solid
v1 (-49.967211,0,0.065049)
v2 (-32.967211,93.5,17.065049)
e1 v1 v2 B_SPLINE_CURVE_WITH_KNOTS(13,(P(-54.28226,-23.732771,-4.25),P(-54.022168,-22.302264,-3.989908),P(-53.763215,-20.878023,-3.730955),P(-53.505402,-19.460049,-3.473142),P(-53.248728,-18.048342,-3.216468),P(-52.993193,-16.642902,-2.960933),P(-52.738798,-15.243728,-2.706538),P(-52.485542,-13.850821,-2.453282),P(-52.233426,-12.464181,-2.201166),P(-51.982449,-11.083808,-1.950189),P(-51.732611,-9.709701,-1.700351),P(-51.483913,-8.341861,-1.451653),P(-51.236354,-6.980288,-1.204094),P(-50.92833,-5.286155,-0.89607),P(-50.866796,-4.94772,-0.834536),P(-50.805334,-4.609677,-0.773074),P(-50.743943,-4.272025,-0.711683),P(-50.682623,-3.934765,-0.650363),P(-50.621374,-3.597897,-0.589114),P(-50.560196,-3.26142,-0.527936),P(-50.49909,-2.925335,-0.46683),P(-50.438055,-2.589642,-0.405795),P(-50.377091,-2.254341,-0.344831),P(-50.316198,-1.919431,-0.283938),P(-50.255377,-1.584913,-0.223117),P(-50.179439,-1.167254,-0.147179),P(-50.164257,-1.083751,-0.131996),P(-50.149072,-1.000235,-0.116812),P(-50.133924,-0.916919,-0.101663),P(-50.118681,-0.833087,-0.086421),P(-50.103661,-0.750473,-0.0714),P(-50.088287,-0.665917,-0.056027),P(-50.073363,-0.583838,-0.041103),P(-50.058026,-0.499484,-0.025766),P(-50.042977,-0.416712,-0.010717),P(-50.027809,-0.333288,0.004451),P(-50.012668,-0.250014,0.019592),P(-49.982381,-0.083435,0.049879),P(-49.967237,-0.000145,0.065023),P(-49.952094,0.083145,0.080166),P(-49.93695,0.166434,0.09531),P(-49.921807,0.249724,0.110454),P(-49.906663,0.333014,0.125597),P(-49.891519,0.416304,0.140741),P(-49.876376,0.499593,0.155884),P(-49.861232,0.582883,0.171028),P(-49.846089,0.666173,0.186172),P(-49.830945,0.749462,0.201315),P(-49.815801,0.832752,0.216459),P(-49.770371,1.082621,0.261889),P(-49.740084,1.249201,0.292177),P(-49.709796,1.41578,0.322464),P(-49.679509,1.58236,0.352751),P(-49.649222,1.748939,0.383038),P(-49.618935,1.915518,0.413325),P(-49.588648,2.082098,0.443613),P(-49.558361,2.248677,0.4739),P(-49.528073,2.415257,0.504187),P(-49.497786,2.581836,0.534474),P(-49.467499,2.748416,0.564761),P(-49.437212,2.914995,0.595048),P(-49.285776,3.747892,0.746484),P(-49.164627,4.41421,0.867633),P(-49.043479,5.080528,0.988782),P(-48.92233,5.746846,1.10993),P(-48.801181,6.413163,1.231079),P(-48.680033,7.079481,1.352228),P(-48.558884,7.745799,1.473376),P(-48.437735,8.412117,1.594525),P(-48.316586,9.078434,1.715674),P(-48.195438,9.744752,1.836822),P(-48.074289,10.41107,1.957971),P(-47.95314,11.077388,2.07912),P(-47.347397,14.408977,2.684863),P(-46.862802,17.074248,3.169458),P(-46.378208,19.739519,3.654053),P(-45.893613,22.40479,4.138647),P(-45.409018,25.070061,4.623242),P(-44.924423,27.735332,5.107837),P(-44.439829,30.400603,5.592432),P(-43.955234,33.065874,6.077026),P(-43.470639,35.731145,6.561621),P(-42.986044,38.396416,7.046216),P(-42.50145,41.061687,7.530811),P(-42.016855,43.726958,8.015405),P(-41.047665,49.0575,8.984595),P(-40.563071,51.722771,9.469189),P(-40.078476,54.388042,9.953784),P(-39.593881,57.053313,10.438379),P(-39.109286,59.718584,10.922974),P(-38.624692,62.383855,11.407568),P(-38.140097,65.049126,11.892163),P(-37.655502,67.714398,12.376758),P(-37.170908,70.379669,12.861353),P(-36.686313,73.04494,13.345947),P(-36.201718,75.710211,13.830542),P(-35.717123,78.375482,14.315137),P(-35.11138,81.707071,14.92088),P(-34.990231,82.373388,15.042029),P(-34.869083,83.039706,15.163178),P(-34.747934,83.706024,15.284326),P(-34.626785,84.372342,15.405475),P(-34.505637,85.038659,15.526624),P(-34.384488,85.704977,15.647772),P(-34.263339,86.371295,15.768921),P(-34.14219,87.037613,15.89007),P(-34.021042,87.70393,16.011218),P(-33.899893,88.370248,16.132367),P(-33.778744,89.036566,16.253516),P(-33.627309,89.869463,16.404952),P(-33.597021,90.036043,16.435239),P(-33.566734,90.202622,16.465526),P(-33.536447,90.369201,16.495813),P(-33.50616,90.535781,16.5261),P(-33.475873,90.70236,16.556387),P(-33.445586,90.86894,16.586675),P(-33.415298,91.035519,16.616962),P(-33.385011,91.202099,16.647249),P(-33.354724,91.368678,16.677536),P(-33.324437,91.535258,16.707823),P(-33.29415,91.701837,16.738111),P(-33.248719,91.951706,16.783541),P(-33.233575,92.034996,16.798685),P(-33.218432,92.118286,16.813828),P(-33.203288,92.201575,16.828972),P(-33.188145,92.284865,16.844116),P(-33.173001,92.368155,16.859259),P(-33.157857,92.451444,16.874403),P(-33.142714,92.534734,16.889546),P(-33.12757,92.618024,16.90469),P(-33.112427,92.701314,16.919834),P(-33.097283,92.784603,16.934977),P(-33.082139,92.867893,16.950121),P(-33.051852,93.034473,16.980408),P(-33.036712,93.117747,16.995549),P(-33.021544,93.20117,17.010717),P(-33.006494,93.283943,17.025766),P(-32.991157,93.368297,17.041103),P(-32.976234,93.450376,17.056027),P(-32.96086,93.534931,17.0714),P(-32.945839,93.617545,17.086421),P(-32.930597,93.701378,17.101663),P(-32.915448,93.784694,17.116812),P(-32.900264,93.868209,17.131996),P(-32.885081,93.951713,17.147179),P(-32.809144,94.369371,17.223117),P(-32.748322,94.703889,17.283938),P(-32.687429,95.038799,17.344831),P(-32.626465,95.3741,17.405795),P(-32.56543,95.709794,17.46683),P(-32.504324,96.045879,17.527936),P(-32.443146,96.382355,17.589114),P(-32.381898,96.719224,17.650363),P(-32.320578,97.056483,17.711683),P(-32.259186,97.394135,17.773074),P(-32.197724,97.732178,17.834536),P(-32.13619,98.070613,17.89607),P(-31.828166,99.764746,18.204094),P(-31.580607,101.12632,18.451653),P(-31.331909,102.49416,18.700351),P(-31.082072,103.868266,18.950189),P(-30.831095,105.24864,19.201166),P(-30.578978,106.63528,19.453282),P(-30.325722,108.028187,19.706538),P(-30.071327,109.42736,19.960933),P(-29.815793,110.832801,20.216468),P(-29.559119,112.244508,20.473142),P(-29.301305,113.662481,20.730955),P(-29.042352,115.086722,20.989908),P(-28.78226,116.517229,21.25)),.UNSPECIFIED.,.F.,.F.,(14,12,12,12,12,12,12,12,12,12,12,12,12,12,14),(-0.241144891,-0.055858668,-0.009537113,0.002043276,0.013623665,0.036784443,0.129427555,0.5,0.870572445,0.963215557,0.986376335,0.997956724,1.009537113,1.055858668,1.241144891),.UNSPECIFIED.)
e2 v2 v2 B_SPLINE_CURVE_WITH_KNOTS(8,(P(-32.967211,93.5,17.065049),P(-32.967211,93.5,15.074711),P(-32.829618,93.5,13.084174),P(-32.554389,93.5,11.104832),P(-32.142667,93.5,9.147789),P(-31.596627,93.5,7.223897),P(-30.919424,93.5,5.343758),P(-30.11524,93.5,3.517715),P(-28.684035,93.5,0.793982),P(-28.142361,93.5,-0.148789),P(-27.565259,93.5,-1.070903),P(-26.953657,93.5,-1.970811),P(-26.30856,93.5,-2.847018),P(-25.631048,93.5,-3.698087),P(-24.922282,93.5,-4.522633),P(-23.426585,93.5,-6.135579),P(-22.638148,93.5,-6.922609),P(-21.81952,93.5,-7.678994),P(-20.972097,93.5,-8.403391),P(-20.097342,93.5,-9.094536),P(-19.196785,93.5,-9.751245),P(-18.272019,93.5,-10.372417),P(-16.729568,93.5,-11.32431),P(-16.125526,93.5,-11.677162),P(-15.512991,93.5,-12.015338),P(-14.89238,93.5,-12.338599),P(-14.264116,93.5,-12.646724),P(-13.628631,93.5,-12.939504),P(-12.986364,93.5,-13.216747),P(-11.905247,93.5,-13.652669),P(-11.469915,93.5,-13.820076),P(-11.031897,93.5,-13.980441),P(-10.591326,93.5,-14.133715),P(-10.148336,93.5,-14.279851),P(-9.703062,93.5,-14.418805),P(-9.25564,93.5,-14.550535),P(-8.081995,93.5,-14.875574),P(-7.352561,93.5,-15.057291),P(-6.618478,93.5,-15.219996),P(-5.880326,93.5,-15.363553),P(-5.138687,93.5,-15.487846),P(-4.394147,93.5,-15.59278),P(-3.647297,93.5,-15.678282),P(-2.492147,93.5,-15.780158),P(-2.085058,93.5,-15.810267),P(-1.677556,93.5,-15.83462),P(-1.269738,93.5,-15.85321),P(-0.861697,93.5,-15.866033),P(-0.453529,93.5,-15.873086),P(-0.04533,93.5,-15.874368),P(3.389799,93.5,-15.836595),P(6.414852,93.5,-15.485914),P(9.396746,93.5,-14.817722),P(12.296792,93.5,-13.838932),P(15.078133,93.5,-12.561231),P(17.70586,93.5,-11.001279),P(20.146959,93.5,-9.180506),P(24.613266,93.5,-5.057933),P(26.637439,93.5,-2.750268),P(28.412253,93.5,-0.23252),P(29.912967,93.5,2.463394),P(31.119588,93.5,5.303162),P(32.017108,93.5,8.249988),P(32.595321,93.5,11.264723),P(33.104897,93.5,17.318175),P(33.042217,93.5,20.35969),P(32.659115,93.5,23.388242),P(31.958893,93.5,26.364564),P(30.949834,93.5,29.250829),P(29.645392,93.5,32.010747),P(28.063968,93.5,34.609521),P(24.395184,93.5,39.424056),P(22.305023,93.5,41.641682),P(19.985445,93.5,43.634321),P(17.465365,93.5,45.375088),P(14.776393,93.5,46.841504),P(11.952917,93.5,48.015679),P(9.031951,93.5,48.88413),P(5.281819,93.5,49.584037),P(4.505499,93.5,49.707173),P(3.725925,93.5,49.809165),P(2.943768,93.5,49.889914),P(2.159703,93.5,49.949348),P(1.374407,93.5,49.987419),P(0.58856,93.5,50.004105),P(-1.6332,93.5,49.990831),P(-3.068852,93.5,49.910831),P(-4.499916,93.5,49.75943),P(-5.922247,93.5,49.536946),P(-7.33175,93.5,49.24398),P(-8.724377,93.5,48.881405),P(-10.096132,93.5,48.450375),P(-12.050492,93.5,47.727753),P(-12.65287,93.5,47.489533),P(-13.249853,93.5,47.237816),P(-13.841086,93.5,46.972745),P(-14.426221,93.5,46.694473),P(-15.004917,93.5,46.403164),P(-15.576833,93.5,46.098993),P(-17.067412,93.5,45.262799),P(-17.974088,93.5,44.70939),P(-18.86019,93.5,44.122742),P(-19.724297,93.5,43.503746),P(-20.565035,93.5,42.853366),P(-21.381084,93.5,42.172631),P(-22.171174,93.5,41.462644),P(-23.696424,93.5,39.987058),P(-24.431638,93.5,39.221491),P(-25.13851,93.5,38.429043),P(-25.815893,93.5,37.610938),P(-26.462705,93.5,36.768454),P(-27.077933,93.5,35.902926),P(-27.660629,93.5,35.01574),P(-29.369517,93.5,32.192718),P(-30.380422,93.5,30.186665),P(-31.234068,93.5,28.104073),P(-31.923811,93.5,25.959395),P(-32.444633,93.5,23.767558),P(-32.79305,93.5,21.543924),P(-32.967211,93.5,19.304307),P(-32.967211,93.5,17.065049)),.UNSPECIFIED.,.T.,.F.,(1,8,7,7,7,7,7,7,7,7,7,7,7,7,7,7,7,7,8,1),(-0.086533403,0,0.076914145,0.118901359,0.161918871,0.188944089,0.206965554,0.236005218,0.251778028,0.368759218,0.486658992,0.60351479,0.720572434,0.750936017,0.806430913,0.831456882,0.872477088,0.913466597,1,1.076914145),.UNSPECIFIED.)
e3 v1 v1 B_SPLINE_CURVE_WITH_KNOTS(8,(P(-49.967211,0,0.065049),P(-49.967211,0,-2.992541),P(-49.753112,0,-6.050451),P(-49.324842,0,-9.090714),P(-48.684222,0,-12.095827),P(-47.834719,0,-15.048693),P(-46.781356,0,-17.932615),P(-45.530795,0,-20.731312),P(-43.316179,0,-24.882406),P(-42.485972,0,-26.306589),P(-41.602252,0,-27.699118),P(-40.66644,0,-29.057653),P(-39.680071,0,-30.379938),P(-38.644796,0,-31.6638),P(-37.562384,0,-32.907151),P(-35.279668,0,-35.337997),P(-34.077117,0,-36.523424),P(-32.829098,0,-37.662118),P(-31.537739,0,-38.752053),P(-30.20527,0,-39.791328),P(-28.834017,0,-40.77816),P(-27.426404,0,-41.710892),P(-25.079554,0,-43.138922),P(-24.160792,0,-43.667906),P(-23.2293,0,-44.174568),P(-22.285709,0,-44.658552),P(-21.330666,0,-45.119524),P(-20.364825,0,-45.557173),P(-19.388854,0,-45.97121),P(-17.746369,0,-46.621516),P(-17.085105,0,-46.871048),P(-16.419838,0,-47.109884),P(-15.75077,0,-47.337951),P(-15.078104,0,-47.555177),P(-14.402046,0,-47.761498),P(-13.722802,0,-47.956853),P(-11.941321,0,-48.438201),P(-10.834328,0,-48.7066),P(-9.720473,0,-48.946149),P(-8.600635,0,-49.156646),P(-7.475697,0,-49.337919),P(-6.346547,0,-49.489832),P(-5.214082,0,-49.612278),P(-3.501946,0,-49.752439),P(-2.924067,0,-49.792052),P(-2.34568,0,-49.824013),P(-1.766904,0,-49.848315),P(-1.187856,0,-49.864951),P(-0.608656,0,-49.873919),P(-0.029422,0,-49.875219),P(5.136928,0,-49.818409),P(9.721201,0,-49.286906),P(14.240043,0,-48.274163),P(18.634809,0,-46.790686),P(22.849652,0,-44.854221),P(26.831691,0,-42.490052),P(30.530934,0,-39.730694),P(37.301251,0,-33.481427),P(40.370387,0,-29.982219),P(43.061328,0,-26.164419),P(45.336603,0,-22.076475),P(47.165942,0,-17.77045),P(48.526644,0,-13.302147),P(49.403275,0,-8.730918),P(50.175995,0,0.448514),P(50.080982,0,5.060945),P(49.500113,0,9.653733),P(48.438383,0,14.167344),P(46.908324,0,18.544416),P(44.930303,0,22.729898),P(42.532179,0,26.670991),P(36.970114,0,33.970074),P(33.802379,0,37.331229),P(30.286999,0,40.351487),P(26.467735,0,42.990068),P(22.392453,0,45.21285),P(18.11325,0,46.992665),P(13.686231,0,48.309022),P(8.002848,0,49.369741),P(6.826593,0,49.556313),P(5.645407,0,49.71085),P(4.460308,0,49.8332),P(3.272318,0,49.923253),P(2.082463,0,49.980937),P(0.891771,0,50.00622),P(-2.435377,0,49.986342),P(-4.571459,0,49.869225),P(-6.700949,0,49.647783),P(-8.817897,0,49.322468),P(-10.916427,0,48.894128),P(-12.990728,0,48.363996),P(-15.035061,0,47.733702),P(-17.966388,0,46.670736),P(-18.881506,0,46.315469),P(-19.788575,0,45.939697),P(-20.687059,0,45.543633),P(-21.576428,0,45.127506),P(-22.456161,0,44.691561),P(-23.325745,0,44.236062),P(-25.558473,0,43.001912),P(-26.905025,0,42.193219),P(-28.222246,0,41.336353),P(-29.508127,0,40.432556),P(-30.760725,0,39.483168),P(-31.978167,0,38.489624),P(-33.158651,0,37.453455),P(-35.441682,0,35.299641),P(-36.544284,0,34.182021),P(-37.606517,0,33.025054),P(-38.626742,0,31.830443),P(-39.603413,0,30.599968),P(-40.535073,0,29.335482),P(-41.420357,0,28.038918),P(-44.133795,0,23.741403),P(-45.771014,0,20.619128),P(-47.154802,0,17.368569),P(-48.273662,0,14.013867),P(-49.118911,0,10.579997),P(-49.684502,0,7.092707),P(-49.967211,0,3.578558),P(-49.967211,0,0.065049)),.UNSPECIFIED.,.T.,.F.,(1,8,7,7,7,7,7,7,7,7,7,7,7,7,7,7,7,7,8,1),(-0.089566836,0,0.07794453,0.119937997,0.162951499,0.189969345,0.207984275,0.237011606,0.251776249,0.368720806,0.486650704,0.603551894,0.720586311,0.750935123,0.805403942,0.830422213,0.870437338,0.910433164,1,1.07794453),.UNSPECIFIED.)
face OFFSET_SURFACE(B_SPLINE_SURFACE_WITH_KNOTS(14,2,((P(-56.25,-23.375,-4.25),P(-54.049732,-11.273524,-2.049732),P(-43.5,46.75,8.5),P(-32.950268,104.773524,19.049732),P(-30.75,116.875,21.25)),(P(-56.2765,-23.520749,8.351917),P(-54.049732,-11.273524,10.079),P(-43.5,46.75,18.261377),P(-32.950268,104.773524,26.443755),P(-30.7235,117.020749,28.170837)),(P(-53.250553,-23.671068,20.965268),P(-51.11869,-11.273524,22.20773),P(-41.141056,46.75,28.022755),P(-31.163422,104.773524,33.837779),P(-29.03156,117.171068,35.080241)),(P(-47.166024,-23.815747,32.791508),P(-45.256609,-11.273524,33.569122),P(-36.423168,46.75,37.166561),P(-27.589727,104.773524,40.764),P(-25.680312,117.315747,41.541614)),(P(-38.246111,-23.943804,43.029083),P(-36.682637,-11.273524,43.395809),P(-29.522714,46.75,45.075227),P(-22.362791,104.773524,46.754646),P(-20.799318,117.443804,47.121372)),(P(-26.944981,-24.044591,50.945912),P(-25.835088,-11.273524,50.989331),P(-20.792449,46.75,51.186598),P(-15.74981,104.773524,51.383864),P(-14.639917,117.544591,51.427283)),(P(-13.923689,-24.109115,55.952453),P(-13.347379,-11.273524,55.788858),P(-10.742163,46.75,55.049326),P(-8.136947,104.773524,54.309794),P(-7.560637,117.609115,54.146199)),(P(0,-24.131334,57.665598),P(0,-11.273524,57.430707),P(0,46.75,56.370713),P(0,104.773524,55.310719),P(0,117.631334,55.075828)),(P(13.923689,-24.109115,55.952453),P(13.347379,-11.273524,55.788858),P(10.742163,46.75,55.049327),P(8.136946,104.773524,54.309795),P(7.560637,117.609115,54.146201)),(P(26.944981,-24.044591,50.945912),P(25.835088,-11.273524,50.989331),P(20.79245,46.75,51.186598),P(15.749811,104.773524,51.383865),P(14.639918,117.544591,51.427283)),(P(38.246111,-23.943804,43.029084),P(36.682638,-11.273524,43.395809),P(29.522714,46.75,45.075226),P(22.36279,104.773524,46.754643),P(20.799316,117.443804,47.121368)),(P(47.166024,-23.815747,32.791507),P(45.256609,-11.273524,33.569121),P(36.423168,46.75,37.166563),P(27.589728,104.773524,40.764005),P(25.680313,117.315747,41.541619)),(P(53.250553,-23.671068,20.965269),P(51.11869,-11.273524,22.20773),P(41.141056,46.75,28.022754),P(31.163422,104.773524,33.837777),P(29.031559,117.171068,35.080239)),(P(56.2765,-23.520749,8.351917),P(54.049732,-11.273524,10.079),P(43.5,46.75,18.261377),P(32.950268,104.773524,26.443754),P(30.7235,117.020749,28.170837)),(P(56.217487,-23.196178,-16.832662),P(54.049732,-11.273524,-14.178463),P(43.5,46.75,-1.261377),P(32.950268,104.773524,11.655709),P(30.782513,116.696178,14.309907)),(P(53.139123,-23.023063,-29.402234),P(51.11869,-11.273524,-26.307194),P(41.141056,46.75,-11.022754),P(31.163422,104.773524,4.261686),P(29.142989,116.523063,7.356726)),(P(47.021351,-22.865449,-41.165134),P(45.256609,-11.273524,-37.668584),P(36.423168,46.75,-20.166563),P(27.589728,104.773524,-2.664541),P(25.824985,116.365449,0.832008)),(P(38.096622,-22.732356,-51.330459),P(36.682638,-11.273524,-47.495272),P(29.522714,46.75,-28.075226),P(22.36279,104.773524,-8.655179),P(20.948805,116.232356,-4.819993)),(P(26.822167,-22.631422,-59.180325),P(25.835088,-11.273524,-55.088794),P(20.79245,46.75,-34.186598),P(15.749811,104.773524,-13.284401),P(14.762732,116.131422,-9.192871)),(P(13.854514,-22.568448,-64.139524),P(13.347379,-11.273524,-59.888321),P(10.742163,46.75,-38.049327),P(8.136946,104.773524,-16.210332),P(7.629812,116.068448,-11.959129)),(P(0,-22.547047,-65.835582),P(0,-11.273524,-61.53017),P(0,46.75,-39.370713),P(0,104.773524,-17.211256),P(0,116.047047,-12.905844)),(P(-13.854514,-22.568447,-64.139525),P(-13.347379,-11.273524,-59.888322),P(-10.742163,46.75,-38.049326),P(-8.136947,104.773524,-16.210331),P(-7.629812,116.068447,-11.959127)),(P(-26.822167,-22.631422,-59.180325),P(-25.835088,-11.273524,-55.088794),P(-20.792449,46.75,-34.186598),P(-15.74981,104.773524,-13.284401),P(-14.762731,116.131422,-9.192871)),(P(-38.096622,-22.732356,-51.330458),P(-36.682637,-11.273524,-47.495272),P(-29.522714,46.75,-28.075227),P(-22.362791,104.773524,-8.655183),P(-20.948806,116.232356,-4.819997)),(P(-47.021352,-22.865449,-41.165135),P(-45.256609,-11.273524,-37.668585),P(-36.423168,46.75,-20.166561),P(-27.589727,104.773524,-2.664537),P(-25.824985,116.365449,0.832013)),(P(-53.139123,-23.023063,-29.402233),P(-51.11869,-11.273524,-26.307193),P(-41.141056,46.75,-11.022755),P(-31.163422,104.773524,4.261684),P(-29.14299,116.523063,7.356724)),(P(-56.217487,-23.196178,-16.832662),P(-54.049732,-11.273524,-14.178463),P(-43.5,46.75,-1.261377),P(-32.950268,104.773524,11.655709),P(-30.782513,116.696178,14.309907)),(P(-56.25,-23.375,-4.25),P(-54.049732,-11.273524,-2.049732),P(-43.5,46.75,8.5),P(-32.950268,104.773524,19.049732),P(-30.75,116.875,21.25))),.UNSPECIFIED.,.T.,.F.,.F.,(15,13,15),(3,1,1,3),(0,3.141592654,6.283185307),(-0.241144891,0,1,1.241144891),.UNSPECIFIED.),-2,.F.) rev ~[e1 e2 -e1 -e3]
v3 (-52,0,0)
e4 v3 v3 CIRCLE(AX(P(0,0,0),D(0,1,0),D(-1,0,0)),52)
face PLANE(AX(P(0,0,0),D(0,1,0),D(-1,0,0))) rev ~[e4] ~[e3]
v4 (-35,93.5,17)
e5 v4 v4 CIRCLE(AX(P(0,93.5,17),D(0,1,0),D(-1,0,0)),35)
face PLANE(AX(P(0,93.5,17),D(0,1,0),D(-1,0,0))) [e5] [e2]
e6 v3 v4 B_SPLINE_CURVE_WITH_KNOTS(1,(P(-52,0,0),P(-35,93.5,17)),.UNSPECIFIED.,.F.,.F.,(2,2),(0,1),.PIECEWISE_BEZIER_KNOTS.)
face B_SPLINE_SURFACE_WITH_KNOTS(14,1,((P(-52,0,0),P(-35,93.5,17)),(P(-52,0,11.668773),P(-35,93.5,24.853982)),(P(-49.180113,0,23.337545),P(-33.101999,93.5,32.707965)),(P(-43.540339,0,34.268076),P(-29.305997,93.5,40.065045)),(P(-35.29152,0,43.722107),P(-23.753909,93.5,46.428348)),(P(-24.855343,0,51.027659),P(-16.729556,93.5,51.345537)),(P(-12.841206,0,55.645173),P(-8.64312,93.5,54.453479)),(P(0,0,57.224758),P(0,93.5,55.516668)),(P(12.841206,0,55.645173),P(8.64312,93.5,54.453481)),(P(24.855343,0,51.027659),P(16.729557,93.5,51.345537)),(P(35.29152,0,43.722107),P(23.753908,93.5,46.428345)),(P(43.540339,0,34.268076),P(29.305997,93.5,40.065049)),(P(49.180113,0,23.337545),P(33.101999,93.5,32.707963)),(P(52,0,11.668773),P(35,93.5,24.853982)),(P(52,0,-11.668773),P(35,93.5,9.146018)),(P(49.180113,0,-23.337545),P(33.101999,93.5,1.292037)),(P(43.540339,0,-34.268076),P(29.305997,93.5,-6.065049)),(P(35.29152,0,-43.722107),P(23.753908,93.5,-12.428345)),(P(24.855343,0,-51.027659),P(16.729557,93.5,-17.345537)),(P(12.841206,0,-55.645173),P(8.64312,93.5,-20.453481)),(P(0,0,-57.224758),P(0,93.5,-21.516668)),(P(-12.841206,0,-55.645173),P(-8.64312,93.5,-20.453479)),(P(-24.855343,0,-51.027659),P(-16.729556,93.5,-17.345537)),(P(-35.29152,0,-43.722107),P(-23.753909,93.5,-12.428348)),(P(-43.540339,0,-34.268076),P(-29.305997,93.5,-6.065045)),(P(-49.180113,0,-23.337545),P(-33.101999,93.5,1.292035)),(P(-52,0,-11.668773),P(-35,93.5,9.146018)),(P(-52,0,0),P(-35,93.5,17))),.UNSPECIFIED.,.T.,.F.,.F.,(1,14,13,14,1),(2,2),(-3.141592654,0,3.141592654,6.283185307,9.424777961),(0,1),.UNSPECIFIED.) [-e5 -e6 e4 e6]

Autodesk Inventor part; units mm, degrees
ref_plane "YZ Plane" through (0, 0, 0) normal (1, 0, 0) x (0, 1, 0)
ref_plane "XY Plane" through (0, 0, 0) normal (0, 0, 1) x (1, 0, 0)
sketch "Szkic6" plane through (0, 0, 0) normal (0, 1, 0) x (-1, 0, 0)
  circle A0 centre (0, 0) radius 52
  dimension "d33" = 104
ref_plane "Płaszczyzna konstrukcyjna1" through (0, 93.5, 0) normal (0, 1, 0) x (-1, 0, 0)
sketch "Szkic7" plane through (0, 93.5, 0) normal (0, 1, 0) x (-1, 0, 0)
  circle A0 centre (0, 17) radius 35
  line L0 (0, -20.3) -> (0, 20.3) construction
  circle A1 centre (0, 0) radius 52 construction
  dimension "d35" = 70
loft "Wyciągnięcie złożone1" add profiles "Szkic6", "Szkic7"
shell "Skorupa1" thickness 2 removed faces 2 at (-13.0142, 93.5, 16.8425) at (-18.5271, 0, 25.061)
equation "\"d33\" = OD1"
equation "\"d35\" = OD2"
equation "\"d52\" = THK"
equation "\"SzerokośćGięciaPodcięcia\" = Grubość"
equation "\"RozmiarPodcięciaNarożnika\" = 4 * Grubość"
equation "\"PromieńPrzejścia\" = PromieńGięcia"
equation "\"Rozmiar_promienia_Jacobiego\" = PromieńGięcia"
equation "\"Wielk_odstępu\" = Grubość"
equation "\"d2\" = PromieńGięcia"
equation "\"d23\" = PromieńGięcia"
equation "\"OD1\" = 104"
equation "\"OD2\" = 70"
equation "\"L\" = 93.5"
equation "\"THK\" = 2"
equation "\"d34\" = L"
equation "\"Grubość\" = 1.5"
equation "\"PromieńGięcia\" = 3"
properties part number "Redukcja asymetryczna Ø104x70x2 L=93,5" material "304"
